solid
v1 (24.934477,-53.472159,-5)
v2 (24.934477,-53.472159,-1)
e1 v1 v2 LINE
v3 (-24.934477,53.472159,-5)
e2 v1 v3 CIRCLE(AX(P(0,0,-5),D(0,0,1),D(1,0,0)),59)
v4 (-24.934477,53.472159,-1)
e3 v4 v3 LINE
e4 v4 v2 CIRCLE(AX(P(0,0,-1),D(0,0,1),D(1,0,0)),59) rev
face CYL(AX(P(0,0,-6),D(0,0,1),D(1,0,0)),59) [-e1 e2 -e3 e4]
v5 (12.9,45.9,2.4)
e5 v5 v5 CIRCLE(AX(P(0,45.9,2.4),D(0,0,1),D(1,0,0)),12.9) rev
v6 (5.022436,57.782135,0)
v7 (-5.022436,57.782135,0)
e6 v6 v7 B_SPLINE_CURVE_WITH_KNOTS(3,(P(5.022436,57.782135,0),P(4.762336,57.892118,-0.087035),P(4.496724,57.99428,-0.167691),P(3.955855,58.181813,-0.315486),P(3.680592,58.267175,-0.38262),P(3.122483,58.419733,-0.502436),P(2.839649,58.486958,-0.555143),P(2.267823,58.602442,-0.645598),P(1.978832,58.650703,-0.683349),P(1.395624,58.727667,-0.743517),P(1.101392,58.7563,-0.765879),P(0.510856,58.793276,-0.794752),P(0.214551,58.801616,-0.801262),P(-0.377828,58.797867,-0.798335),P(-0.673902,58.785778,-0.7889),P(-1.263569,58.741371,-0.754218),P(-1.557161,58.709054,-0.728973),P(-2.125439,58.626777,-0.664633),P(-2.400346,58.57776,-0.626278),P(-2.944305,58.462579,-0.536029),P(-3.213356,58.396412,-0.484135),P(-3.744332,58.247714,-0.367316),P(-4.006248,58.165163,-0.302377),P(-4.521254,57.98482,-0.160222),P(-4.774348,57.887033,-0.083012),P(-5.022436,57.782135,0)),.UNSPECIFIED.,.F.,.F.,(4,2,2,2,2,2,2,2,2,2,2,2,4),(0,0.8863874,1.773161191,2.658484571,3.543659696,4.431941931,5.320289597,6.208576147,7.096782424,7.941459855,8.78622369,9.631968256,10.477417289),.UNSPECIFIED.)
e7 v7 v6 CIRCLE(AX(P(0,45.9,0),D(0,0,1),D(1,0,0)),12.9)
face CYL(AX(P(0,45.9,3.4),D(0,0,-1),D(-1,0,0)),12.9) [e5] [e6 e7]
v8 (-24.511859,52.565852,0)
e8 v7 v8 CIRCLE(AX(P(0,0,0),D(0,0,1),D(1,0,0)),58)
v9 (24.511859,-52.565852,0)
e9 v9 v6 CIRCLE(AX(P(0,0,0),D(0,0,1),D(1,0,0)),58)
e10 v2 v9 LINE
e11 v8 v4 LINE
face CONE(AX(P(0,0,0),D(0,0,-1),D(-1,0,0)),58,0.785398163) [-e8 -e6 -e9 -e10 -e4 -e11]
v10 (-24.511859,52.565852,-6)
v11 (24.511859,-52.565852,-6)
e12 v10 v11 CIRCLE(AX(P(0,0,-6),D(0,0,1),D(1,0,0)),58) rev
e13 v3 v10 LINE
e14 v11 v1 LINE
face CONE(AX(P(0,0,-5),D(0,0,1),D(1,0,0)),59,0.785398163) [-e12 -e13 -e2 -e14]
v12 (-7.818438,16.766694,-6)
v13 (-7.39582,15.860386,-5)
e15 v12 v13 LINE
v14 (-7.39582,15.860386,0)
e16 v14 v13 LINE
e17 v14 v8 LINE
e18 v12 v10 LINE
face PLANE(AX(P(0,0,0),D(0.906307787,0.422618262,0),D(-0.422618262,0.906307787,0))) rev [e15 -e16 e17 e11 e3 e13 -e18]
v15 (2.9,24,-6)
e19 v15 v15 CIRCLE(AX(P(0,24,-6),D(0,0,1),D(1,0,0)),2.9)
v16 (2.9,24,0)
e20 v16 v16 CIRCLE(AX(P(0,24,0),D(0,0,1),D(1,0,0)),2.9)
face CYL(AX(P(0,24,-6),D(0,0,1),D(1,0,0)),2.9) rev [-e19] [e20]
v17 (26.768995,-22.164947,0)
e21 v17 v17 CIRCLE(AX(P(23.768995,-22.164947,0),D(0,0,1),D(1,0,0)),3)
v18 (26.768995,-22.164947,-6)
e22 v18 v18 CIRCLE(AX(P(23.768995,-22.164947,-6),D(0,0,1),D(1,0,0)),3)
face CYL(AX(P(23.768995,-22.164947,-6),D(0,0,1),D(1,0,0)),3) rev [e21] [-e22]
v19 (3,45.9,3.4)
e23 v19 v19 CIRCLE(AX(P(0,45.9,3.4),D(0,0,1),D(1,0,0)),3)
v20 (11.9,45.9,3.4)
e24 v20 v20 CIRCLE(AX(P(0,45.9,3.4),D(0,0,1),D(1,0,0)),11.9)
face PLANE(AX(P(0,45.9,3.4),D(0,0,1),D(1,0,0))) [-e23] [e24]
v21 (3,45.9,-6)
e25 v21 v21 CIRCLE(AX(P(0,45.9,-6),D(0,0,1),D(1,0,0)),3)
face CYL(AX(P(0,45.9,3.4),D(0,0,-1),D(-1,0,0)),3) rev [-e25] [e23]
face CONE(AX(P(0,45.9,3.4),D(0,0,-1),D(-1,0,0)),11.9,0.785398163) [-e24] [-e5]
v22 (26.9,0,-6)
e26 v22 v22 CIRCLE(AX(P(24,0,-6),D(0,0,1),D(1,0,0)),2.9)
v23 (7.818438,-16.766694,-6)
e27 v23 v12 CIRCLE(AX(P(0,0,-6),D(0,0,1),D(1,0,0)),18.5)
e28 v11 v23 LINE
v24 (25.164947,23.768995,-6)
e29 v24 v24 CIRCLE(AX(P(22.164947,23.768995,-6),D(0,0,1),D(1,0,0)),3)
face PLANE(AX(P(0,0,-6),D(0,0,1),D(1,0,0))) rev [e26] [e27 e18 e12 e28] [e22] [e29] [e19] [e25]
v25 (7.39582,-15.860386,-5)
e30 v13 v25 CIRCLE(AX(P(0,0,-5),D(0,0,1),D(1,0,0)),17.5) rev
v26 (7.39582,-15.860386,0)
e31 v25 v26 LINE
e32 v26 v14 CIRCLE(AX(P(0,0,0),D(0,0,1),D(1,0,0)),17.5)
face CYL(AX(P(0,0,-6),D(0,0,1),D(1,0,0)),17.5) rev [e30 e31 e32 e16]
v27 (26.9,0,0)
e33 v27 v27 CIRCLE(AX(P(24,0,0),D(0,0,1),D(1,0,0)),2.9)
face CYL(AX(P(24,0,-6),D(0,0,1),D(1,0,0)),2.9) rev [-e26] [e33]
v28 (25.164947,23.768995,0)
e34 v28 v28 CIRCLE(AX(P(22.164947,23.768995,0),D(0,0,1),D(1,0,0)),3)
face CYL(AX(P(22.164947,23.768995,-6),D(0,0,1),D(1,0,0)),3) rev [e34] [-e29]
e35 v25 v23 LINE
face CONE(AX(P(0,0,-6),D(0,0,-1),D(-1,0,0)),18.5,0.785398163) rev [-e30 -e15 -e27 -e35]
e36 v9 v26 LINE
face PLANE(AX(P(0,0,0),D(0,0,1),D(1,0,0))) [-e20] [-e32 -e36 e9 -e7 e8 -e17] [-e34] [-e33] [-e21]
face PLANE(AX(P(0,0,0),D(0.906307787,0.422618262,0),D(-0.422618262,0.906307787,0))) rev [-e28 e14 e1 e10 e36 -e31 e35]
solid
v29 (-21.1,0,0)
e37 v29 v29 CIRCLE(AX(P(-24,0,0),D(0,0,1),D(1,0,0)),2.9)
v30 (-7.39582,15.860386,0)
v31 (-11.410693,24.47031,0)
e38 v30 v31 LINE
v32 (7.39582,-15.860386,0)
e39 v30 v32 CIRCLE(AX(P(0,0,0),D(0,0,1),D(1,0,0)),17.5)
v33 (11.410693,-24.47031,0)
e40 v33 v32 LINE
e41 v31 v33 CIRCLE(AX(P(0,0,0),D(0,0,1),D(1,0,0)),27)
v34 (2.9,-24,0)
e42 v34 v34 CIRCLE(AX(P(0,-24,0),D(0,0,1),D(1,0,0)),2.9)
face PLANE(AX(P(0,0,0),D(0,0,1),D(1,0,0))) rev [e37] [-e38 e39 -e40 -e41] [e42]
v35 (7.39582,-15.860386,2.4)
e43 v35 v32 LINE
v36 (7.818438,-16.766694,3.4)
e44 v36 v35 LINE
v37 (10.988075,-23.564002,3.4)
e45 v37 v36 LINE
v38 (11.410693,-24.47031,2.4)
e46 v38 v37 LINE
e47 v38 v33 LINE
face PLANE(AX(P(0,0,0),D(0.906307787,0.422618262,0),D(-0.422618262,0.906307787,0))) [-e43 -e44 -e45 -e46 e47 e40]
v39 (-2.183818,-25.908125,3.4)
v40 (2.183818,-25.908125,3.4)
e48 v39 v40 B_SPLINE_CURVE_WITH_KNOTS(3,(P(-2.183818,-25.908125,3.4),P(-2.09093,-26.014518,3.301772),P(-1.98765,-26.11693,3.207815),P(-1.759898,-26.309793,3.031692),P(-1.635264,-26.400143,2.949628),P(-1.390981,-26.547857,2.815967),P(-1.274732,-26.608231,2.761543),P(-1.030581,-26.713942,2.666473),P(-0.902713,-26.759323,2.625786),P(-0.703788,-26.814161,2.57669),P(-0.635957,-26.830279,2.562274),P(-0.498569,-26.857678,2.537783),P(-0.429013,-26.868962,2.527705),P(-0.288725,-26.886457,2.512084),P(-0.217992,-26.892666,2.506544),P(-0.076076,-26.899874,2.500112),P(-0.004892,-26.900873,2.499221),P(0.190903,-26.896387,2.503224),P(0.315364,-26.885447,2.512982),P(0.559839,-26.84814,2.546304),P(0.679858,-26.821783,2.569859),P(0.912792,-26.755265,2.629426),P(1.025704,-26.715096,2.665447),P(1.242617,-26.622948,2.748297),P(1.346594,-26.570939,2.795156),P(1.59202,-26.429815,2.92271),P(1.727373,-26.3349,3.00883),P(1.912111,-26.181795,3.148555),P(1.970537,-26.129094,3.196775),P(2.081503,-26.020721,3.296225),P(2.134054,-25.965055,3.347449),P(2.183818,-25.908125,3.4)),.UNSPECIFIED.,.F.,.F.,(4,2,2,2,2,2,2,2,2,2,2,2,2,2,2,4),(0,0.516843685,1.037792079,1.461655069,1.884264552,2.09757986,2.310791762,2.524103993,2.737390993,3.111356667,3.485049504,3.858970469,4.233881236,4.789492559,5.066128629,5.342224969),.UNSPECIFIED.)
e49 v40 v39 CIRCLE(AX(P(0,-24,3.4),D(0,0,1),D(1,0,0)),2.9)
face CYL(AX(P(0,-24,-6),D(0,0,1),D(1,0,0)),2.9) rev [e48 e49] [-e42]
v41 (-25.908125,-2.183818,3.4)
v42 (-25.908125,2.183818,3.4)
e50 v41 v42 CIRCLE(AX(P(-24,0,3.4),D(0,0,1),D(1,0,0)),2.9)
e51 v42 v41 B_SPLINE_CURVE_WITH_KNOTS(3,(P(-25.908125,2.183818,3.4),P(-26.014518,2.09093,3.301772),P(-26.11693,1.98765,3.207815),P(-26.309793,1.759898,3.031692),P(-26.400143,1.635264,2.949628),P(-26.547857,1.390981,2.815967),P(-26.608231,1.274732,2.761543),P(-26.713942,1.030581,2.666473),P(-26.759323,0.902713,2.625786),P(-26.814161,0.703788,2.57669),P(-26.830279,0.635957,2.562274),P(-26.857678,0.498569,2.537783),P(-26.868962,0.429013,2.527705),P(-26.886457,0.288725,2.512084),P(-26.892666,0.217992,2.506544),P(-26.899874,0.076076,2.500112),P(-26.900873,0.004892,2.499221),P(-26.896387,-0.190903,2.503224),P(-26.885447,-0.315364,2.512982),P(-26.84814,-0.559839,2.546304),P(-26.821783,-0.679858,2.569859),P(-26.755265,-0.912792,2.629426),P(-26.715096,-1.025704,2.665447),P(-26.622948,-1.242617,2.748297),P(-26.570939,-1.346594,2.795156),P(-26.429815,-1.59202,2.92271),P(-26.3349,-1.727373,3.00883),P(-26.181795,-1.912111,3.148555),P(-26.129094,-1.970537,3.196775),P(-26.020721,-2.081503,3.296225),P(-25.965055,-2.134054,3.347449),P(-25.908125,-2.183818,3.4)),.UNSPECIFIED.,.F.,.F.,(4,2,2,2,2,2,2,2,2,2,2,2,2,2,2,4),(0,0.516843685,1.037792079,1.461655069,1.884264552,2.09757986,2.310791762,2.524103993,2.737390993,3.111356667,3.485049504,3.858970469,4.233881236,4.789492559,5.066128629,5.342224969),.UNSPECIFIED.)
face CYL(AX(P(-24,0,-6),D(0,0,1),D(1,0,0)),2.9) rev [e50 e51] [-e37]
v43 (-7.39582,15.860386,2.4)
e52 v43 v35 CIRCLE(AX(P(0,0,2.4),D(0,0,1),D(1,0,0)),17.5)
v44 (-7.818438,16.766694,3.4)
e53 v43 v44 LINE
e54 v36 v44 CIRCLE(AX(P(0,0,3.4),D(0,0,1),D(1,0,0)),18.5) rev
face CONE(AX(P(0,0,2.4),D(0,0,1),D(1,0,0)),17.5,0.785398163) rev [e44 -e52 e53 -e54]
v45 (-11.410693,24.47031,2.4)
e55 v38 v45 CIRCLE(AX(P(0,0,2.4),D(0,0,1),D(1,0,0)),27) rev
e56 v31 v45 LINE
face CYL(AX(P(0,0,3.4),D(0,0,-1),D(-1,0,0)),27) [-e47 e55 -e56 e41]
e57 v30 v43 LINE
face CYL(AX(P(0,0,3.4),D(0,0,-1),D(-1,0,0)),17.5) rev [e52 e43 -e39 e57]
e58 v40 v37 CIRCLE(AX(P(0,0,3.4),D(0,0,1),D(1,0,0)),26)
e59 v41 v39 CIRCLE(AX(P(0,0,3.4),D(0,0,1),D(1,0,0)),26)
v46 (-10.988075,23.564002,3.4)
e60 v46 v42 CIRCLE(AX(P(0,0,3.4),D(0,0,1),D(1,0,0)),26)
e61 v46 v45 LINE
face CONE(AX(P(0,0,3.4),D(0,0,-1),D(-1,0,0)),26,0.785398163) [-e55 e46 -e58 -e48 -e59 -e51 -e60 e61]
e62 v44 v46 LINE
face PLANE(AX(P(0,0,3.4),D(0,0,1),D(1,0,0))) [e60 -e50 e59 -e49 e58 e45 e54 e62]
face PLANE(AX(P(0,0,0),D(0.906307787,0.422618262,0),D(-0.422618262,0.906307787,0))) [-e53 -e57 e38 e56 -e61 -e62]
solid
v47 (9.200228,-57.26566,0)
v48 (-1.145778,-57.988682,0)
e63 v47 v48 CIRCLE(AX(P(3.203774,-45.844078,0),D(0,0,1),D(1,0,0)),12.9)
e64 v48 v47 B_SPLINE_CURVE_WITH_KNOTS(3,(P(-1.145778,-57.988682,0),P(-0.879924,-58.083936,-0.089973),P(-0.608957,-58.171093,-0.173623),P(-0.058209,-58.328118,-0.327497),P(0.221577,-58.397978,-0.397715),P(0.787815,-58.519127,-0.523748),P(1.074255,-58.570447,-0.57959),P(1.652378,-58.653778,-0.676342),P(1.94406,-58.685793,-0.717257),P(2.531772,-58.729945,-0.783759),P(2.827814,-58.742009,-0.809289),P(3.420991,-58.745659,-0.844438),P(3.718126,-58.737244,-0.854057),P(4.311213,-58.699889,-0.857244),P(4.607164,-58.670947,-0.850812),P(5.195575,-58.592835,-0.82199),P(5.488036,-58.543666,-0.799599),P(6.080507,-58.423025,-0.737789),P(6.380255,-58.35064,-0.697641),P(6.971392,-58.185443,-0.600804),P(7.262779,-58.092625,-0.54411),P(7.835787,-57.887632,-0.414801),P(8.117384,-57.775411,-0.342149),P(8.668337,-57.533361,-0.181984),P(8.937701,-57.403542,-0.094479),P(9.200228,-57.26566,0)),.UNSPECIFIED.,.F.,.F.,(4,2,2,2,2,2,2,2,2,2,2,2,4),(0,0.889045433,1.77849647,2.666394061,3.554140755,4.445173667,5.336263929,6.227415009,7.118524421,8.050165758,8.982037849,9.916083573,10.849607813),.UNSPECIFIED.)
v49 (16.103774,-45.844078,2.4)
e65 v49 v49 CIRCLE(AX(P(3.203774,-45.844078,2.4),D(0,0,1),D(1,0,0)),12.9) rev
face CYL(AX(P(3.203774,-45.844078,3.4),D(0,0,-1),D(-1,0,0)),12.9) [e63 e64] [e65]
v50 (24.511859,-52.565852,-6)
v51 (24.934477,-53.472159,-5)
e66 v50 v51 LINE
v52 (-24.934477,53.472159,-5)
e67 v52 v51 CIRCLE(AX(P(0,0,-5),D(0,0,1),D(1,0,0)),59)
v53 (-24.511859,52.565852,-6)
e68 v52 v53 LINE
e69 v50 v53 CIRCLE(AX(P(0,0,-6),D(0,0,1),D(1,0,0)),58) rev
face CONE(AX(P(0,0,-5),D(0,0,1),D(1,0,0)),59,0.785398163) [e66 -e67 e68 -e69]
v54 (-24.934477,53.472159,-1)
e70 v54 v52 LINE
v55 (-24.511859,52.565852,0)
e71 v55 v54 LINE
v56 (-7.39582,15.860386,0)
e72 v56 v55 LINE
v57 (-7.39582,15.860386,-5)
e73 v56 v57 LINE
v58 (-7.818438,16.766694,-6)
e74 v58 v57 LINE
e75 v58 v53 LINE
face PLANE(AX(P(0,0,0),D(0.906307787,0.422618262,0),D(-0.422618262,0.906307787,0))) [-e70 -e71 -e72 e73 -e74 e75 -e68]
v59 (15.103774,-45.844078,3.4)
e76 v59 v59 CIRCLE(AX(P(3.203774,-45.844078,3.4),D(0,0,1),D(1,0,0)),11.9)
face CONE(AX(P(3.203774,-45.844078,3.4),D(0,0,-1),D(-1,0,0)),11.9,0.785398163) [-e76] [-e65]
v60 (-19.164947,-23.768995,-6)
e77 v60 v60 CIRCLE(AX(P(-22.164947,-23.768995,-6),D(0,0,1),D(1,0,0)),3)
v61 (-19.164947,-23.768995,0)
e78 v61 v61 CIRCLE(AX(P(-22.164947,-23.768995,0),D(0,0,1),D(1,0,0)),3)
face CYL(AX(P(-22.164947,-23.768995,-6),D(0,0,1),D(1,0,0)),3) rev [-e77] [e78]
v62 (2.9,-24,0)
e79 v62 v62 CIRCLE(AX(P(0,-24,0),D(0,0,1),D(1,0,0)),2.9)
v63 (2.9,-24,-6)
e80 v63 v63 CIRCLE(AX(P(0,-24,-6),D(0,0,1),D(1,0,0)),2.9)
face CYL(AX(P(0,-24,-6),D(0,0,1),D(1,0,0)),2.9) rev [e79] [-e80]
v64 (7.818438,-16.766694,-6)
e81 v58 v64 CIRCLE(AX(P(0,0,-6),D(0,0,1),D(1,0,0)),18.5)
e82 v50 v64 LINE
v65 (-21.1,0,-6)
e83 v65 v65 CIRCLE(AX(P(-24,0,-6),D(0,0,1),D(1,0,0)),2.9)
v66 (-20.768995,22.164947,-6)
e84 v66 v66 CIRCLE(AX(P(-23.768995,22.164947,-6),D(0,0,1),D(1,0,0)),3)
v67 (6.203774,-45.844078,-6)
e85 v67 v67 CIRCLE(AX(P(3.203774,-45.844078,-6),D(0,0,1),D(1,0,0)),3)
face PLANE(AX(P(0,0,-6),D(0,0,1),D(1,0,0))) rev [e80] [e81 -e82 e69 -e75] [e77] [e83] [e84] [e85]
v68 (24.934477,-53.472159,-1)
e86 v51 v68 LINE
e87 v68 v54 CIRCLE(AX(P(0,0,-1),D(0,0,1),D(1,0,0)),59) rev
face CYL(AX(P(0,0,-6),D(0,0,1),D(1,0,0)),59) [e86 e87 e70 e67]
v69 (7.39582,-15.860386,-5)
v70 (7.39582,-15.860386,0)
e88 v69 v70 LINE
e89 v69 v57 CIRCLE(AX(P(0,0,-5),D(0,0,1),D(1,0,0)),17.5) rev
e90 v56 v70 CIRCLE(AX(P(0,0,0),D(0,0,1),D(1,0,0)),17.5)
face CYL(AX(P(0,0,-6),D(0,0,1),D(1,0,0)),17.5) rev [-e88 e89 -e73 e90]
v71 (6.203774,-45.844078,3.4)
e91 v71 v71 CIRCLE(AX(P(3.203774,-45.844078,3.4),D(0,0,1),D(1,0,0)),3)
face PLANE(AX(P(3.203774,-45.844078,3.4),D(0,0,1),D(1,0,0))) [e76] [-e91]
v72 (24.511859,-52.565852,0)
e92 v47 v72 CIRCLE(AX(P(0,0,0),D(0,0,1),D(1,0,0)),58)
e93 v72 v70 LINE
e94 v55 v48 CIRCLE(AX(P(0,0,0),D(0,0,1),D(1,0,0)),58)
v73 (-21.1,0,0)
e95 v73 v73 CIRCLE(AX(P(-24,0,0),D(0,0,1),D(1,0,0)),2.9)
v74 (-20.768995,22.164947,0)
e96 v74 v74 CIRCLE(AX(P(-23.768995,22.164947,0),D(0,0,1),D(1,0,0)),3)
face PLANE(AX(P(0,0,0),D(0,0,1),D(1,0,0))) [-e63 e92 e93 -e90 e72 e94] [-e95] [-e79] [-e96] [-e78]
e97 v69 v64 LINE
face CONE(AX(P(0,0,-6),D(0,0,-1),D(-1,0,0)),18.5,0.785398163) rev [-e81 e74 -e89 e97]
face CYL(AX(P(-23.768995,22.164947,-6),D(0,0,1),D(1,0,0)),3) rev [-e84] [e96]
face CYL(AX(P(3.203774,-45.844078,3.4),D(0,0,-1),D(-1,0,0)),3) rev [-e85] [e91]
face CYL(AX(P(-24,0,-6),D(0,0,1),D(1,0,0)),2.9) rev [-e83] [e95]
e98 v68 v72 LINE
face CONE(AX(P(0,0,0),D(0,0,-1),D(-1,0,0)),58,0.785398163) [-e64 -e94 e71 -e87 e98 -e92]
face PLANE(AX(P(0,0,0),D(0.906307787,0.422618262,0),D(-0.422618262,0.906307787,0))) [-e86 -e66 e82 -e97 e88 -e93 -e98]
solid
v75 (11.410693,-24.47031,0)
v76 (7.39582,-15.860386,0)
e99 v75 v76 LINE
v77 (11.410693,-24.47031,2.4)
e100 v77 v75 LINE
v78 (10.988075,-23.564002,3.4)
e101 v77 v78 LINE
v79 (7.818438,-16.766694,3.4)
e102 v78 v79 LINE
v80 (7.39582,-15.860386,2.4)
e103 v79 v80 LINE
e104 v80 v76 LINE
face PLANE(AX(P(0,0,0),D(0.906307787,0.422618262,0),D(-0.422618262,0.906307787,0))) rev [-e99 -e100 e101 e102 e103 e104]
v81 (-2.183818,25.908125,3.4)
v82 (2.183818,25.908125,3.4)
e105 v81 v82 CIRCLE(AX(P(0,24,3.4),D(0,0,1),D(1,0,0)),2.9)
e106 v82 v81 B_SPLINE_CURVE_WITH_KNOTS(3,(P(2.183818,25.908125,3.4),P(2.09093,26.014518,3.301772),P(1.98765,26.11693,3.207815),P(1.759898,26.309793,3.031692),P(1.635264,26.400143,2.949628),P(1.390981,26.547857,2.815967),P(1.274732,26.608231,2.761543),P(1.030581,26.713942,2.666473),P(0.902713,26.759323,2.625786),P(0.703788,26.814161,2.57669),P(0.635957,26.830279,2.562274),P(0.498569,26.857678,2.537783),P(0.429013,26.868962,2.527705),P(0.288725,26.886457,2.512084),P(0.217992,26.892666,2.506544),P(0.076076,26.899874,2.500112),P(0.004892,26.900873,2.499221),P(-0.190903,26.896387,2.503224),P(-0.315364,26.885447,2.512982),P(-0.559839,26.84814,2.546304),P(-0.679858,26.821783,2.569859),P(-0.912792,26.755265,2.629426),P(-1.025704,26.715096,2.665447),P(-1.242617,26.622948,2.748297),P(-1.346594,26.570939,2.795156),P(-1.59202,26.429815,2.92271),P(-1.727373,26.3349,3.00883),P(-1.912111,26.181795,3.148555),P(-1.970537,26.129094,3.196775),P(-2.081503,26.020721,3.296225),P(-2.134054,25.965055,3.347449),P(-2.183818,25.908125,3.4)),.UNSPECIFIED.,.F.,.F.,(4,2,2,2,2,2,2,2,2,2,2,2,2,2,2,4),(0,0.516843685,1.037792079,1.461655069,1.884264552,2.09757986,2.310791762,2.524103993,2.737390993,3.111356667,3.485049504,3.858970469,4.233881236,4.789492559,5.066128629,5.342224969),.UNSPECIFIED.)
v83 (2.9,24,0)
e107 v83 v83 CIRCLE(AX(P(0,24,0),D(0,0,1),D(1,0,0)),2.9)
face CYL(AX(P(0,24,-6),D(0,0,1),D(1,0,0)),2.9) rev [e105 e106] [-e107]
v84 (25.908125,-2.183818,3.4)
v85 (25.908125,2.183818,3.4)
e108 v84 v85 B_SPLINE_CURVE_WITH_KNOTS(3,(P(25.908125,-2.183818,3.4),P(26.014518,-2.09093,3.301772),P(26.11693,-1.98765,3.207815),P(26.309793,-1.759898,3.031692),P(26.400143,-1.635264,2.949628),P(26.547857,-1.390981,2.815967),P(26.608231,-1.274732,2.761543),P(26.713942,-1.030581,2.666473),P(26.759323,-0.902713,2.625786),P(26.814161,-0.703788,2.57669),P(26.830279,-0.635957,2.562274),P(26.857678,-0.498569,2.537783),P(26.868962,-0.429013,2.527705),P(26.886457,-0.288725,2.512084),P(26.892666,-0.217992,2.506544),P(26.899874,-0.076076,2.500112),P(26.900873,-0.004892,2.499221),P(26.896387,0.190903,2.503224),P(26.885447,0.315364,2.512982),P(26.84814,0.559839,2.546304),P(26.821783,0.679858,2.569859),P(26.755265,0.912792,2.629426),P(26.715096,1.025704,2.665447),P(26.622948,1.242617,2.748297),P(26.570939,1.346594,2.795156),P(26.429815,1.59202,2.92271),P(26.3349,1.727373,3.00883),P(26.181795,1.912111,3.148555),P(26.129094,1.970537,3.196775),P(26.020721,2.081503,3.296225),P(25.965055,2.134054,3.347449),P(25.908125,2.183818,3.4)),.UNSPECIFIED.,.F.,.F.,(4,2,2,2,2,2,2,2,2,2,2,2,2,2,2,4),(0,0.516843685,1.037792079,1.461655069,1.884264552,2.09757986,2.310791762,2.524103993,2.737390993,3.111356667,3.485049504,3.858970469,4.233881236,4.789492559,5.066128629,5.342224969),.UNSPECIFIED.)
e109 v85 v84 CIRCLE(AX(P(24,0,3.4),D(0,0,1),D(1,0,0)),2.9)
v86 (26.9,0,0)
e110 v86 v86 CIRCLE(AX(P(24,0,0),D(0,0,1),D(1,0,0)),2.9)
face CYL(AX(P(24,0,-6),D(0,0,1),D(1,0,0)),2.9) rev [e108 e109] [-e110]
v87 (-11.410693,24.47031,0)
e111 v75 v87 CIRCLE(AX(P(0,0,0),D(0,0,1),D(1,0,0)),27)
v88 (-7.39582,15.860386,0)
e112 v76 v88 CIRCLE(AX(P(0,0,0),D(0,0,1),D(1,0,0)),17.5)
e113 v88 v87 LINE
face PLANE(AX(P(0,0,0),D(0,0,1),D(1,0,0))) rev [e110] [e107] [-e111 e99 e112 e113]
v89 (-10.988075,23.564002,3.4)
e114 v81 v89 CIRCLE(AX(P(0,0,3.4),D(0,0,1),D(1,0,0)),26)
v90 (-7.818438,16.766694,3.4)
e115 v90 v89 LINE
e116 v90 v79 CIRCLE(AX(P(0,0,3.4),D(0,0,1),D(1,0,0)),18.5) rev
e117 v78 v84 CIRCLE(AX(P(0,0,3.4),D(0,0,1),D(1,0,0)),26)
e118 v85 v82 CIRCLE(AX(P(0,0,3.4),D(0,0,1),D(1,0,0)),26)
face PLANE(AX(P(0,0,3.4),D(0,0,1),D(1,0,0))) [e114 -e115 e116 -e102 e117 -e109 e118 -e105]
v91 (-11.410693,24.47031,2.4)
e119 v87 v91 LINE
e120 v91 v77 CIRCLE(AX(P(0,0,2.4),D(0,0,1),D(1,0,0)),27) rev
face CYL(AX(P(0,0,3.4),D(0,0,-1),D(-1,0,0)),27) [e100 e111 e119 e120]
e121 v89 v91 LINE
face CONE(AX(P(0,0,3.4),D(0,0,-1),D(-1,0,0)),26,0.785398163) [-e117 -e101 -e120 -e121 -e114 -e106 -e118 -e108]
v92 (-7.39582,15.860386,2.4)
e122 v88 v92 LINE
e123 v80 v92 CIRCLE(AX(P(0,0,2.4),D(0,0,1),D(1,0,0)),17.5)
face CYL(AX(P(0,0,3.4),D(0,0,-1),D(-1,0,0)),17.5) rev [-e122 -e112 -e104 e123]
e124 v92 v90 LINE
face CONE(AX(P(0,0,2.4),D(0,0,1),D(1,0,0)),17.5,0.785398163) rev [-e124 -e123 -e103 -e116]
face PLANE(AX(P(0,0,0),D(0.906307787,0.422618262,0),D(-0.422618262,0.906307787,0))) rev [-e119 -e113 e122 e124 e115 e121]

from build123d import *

# Parameters (mm, degrees)
SKETCH1_R                = 27
SKETCH1_R_2              = 17.5
BOSS_EXTRUDE1_DEPTH      = 3.4
SKETCH3_R                = 59
SKETCH3_R_2              = 17.5
BOSS_EXTRUDE2_DEPTH      = 6
CUT_EXTRUDE1_DEPTH       = 84.654049513
CUT_EXTRUDE1_DEPTH_BACK  = 84.654049513
SKETCH2_R                = 2.9
SKETCH2_R_2              = 3
SKETCH4_R                = 12.9
SKETCH4_R_2              = 3
BOSS_EXTRUDE3_DEPTH      = 3.4
CUT_EXTRUDE2_DEPTH       = 84.654049513
CUT_EXTRUDE2_DEPTH_BACK  = 84.654049513
SKETCH4_2_R              = 3
CHAMFER1_SIZE            = 1
CHAMFER2_SIZE            = 1
INTERSECT1_OUTLINE_W     = 122
INTERSECT1_OUTLINE_H     = 9.4
INTERSECT1_DEPTH         = 60
INTERSECT1_START         = -6
INTERSECT1_2_OUTLINE_R   = 3
INTERSECT1_2_OUTLINE_R_2 = 2.9
INTERSECT1_2_DEPTH       = 6
INTERSECT1_3_OUTLINE_R   = 12.9
INTERSECT1_3_OUTLINE_R_2 = 3
INTERSECT1_3_DEPTH       = 3.4
INTERSECT1_6_OUTLINE_W   = 0.8
INTERSECT1_6_OUTLINE_H   = 0.800254312
INTERSECT1_7_OUTLINE_R   = 2.9
INTERSECT1_7_DEPTH       = 3.4
INTERSECT1_9_OUTLINE_W   = 56
INTERSECT1_9_OUTLINE_H   = 3.4
INTERSECT1_9_DEPTH       = 28


with BuildPart() as part:
    # Sketch1 → Boss-Extrude1 (new body)
    with BuildSketch(Plane.XY):
        Circle(SKETCH1_R)
        Circle(SKETCH1_R_2, mode=Mode.SUBTRACT)
    extrude(amount=BOSS_EXTRUDE1_DEPTH)


with BuildPart() as body_2:
    # Sketch3 → Boss-Extrude2 (new body)
    with BuildSketch(Plane.XY):
        Circle(SKETCH3_R)
        Circle(SKETCH3_R_2, mode=Mode.SUBTRACT)
    extrude(amount=-BOSS_EXTRUDE2_DEPTH)


with BuildPart() as cut_extrude1_tool:
    # Sketch2 → Cut-Extrude1 (new, two sides: drawn at the far end of the back side and taken through both)
    with BuildSketch(Plane.XY.offset(-CUT_EXTRUDE1_DEPTH_BACK)):
        with Locations((0, 24)):
            Circle(SKETCH2_R)
        with Locations((24, 0)):
            Circle(SKETCH2_R)
        with Locations((0, -24)):
            Circle(SKETCH2_R)
        with Locations((-24, 0)):
            Circle(SKETCH2_R)
        with Locations((-23.768995303, 22.164946702)):
            Circle(SKETCH2_R_2)
        with Locations((22.164946702, 23.768995303)):
            Circle(SKETCH2_R_2)
        with Locations((23.768995303, -22.164946702)):
            Circle(SKETCH2_R_2)
        with Locations((-22.164946702, -23.768995303)):
            Circle(SKETCH2_R_2)
    extrude(amount=CUT_EXTRUDE1_DEPTH + CUT_EXTRUDE1_DEPTH_BACK)


with BuildPart() as part_1:
    add(part.part)

    # Cut-Extrude1: cut by cut_extrude1_tool
    add(cut_extrude1_tool.part, mode=Mode.SUBTRACT)

    # Chamfer2
    # the kernel refuses this chamfer: 1 mm, written as the material it takes off along each edge
    with BuildSketch(Plane(origin=(0, 0, 3.4), x_dir=(1, 0, 0), z_dir=(0, -1, 0))) as chamfer2_piece_1:
        Polygon((27, -CHAMFER2_SIZE), (27 - CHAMFER2_SIZE, 0), (27, 0), align=None)
    revolve(axis=Axis((0, 0, 3.4), (0, 0, 1)), mode=Mode.SUBTRACT)
    with BuildSketch(Plane(origin=(0, 0, 3.4), x_dir=(1, 0, 0), z_dir=(0, -1, 0))) as chamfer2_piece_2:
        Polygon((17.5 + CHAMFER2_SIZE, 0), (17.5, -CHAMFER2_SIZE), (17.5, 0), align=None)
    revolve(axis=Axis((0, 0, 3.4), (0, 0, 1)), mode=Mode.SUBTRACT)

    # Intersect1 9 outline → Intersect1 9 (cut)
    with BuildSketch(Plane(origin=(0, 0, 0), x_dir=(-0.4226182617406999, 0.9063077870366498, 0), z_dir=(0.9063077870366498, 0.4226182617406999, 0))):
        with Locations((0, 1.7)):
            Rectangle(INTERSECT1_9_OUTLINE_W, INTERSECT1_9_OUTLINE_H)
    extrude(amount=INTERSECT1_9_DEPTH, mode=Mode.SUBTRACT)


with BuildPart() as body_2_1:
    add(body_2.part)

    # Cut-Extrude1: cut by cut_extrude1_tool
    add(cut_extrude1_tool.part, mode=Mode.SUBTRACT)

    # Sketch4 → Boss-Extrude3 (add)
    # profile 1 of 2: a face of its own
    with BuildSketch(Plane.XY):
        with Locations((0, 45.9)):
            Circle(SKETCH4_R)
        with Locations((0, 45.9)):
            Circle(SKETCH4_R_2, mode=Mode.SUBTRACT)
    # profile 2 of 2: a face of its own
    with BuildSketch(Plane.XY):
        with Locations((3.203773797, -45.84407792)):
            Circle(SKETCH4_R)
        with Locations((3.203773797, -45.84407792)):
            Circle(SKETCH4_R_2, mode=Mode.SUBTRACT)
    extrude(amount=BOSS_EXTRUDE3_DEPTH)

    # Sketch4<2> → Cut-Extrude2 (cut, two sides: drawn at the far end of the back side and taken through both)
    with BuildSketch(Plane.XY.offset(-CUT_EXTRUDE2_DEPTH_BACK)):
        with Locations((0, 45.9)):
            Circle(SKETCH4_2_R)
        with Locations((3.203773797, -45.84407792)):
            Circle(SKETCH4_2_R)
    extrude(amount=CUT_EXTRUDE2_DEPTH + CUT_EXTRUDE2_DEPTH_BACK, mode=Mode.SUBTRACT)

    # Chamfer1
    # the kernel refuses this chamfer: 1 mm, written as the material it takes off along each edge
    with BuildSketch(Plane(origin=(0, 0, 0), x_dir=(1, 0, 0), z_dir=(0, -1, 0))) as chamfer1_piece_1_section:
        Polygon((59, -CHAMFER1_SIZE), (59 - CHAMFER1_SIZE, 0), (59, 0), align=None)
    chamfer1_piece_1 = revolve(axis=Axis((0, 0, 0), (0, 0, 1)), mode=Mode.PRIVATE)
    chamfer1_piece_1 = chamfer1_piece_1 - Plane(origin=(3.203773797, -45.84407792, 0), x_dir=(1, 0, 0), z_dir=(0, 0, -1)) * Cylinder(12.9, 237, mode=Mode.PRIVATE)
    chamfer1_piece_1 = chamfer1_piece_1 - Plane(origin=(0, 45.9, 0), x_dir=(1, 0, 0), z_dir=(0, 0, -1)) * Cylinder(12.9, 237, mode=Mode.PRIVATE)
    add(chamfer1_piece_1, mode=Mode.SUBTRACT)
    with BuildSketch(Plane(origin=(0, 0, -6), x_dir=(1, 0, 0), z_dir=(0, -1, 0))) as chamfer1_piece_2:
        Polygon((59, CHAMFER1_SIZE), (59 - CHAMFER1_SIZE, 0), (59, 0), align=None)
    revolve(axis=Axis((0, 0, -6), (0, 0, 1)), mode=Mode.SUBTRACT)
    with BuildSketch(Plane(origin=(0, 0, -6), x_dir=(1, 0, 0), z_dir=(0, -1, 0))) as chamfer1_piece_3:
        Polygon((17.5 + CHAMFER1_SIZE, 0), (17.5, CHAMFER1_SIZE), (17.5, 0), align=None)
    revolve(axis=Axis((0, 0, -6), (0, 0, 1)), mode=Mode.SUBTRACT)
    with BuildSketch(Plane(origin=(0, 45.9, 3.4), x_dir=(1, 0, 0), z_dir=(0, -1, 0))) as chamfer1_piece_4:
        Polygon((12.9, -CHAMFER1_SIZE), (12.9 - CHAMFER1_SIZE, 0), (12.9, 0), align=None)
    revolve(axis=Axis((0, 45.9, 3.4), (0, 0, 1)), mode=Mode.SUBTRACT)
    with BuildSketch(Plane(origin=(3.203773797, -45.84407792, 3.4), x_dir=(1, 0, 0), z_dir=(0, -1, 0))) as chamfer1_piece_5:
        Polygon((12.9, -CHAMFER1_SIZE), (12.9 - CHAMFER1_SIZE, 0), (12.9, 0), align=None)
    revolve(axis=Axis((3.203773797, -45.84407792, 3.4), (0, 0, 1)), mode=Mode.SUBTRACT)

    # Intersect1: read off the stored shape, not the designer's step
    # Intersect1 outline → Intersect1 (cut)
    with BuildSketch(Plane(origin=(0, 0, 0), x_dir=(-0.4226182617406999, 0.9063077870366498, 0), z_dir=(0.9063077870366498, 0.4226182617406999, 0))):
        with Locations((0, -1.3)):
            Rectangle(INTERSECT1_OUTLINE_W, INTERSECT1_OUTLINE_H)
    extrude(amount=INTERSECT1_DEPTH, mode=Mode.SUBTRACT)


with BuildPart() as body_3:
    # Intersect1 2 outline → Intersect1 2 (new body)
    with BuildSketch(Plane.XY.offset(INTERSECT1_START)):
        with BuildLine():
            Line((7.39581958, -15.860386273), (24.934477443, -53.472159435))
            ThreePointArc((24.934477443, -53.472159435), (53.472159435, 24.934477443), (-24.934477443, 53.472159435))
            Line((-24.934477443, 53.472159435), (-7.39581958, 15.860386273))
            ThreePointArc((-7.39581958, 15.860386273), (15.860386273, 7.39581958), (7.39581958, -15.860386273))
        make_face()
        with Locations((23.768995303, -22.164946702)):
            Circle(INTERSECT1_2_OUTLINE_R, mode=Mode.SUBTRACT)
        with Locations((24, 0)):
            Circle(INTERSECT1_2_OUTLINE_R_2, mode=Mode.SUBTRACT)
        with Locations((0, 24)):
            Circle(INTERSECT1_2_OUTLINE_R_2, mode=Mode.SUBTRACT)
        with Locations((22.164946702, 23.768995303)):
            Circle(INTERSECT1_2_OUTLINE_R, mode=Mode.SUBTRACT)
        with Locations((0, 45.9)):
            Circle(INTERSECT1_2_OUTLINE_R, mode=Mode.SUBTRACT)
    extrude(amount=INTERSECT1_2_DEPTH)

    # Intersect1 3 outline → Intersect1 3 (add)
    with BuildSketch(Plane.XY):
        with Locations((0, 45.9)):
            Circle(INTERSECT1_3_OUTLINE_R)
        with Locations((0, 45.9)):
            Circle(INTERSECT1_3_OUTLINE_R_2, mode=Mode.SUBTRACT)
    extrude(amount=INTERSECT1_3_DEPTH)

    # Intersect1 4 outline → Intersect1 4 (revolve, cut)
    with BuildSketch(Plane.XZ):
        Polygon((59, 0), (58, 0), (59, -1), align=None)
        Polygon((59, -6), (59, -5), (58, -6), align=None)
        Polygon((17.5, -6), (18.5, -6), (17.5, -5), align=None)
    revolve(axis=Axis((0, 0, 0), (0, 0, 1)), mode=Mode.SUBTRACT)

    # Intersect1 5 outline → Intersect1 5 (revolve, cut)
    with BuildSketch(Plane.XZ.offset(-45.9)):
        Polygon((11.9, 3.4), (12.9, 2.4), (12.9, 3.4), align=None)
    revolve(axis=Axis((0, 45.9, 0), (0, 0, 1)), mode=Mode.SUBTRACT)

    # Intersect1 6 outline → Intersect1 6 (revolve)
    with BuildSketch(Plane.XZ.offset(-45.9)):
        with Locations((12.5, -0.400127156)):
            Rectangle(INTERSECT1_6_OUTLINE_W, INTERSECT1_6_OUTLINE_H)
    revolve(axis=Axis((0, 45.9, 0), (0, 0, 1)))


with BuildPart() as body_4:
    # Intersect1 7 outline → Intersect1 7 (new body)
    with BuildSketch(Plane.XY):
        with BuildLine():
            Line((7.39581958, -15.860386273), (11.410693067, -24.47031025))
            ThreePointArc((11.410693067, -24.47031025), (24.47031025, 11.410693067), (-11.410693067, 24.47031025))
            Line((-11.410693067, 24.47031025), (-7.39581958, 15.860386273))
            ThreePointArc((-7.39581958, 15.860386273), (15.860386273, 7.39581958), (7.39581958, -15.860386273))
        make_face()
        with Locations((24, 0)):
            Circle(INTERSECT1_7_OUTLINE_R, mode=Mode.SUBTRACT)
        with Locations((0, 24)):
            Circle(INTERSECT1_7_OUTLINE_R, mode=Mode.SUBTRACT)
    extrude(amount=INTERSECT1_7_DEPTH)

    # Intersect1 8 outline → Intersect1 8 (revolve, cut)
    with BuildSketch(Plane.XZ):
        Polygon((27, 3.4), (26, 3.4), (27, 2.4), align=None)
        Polygon((17.5, 2.4), (18.5, 3.4), (17.5, 3.4), align=None)
    revolve(axis=Axis((0, 0, 0), (0, 0, 1)), mode=Mode.SUBTRACT)


solid = Compound([part_1.part, body_2_1.part, body_3.part, body_4.part])
